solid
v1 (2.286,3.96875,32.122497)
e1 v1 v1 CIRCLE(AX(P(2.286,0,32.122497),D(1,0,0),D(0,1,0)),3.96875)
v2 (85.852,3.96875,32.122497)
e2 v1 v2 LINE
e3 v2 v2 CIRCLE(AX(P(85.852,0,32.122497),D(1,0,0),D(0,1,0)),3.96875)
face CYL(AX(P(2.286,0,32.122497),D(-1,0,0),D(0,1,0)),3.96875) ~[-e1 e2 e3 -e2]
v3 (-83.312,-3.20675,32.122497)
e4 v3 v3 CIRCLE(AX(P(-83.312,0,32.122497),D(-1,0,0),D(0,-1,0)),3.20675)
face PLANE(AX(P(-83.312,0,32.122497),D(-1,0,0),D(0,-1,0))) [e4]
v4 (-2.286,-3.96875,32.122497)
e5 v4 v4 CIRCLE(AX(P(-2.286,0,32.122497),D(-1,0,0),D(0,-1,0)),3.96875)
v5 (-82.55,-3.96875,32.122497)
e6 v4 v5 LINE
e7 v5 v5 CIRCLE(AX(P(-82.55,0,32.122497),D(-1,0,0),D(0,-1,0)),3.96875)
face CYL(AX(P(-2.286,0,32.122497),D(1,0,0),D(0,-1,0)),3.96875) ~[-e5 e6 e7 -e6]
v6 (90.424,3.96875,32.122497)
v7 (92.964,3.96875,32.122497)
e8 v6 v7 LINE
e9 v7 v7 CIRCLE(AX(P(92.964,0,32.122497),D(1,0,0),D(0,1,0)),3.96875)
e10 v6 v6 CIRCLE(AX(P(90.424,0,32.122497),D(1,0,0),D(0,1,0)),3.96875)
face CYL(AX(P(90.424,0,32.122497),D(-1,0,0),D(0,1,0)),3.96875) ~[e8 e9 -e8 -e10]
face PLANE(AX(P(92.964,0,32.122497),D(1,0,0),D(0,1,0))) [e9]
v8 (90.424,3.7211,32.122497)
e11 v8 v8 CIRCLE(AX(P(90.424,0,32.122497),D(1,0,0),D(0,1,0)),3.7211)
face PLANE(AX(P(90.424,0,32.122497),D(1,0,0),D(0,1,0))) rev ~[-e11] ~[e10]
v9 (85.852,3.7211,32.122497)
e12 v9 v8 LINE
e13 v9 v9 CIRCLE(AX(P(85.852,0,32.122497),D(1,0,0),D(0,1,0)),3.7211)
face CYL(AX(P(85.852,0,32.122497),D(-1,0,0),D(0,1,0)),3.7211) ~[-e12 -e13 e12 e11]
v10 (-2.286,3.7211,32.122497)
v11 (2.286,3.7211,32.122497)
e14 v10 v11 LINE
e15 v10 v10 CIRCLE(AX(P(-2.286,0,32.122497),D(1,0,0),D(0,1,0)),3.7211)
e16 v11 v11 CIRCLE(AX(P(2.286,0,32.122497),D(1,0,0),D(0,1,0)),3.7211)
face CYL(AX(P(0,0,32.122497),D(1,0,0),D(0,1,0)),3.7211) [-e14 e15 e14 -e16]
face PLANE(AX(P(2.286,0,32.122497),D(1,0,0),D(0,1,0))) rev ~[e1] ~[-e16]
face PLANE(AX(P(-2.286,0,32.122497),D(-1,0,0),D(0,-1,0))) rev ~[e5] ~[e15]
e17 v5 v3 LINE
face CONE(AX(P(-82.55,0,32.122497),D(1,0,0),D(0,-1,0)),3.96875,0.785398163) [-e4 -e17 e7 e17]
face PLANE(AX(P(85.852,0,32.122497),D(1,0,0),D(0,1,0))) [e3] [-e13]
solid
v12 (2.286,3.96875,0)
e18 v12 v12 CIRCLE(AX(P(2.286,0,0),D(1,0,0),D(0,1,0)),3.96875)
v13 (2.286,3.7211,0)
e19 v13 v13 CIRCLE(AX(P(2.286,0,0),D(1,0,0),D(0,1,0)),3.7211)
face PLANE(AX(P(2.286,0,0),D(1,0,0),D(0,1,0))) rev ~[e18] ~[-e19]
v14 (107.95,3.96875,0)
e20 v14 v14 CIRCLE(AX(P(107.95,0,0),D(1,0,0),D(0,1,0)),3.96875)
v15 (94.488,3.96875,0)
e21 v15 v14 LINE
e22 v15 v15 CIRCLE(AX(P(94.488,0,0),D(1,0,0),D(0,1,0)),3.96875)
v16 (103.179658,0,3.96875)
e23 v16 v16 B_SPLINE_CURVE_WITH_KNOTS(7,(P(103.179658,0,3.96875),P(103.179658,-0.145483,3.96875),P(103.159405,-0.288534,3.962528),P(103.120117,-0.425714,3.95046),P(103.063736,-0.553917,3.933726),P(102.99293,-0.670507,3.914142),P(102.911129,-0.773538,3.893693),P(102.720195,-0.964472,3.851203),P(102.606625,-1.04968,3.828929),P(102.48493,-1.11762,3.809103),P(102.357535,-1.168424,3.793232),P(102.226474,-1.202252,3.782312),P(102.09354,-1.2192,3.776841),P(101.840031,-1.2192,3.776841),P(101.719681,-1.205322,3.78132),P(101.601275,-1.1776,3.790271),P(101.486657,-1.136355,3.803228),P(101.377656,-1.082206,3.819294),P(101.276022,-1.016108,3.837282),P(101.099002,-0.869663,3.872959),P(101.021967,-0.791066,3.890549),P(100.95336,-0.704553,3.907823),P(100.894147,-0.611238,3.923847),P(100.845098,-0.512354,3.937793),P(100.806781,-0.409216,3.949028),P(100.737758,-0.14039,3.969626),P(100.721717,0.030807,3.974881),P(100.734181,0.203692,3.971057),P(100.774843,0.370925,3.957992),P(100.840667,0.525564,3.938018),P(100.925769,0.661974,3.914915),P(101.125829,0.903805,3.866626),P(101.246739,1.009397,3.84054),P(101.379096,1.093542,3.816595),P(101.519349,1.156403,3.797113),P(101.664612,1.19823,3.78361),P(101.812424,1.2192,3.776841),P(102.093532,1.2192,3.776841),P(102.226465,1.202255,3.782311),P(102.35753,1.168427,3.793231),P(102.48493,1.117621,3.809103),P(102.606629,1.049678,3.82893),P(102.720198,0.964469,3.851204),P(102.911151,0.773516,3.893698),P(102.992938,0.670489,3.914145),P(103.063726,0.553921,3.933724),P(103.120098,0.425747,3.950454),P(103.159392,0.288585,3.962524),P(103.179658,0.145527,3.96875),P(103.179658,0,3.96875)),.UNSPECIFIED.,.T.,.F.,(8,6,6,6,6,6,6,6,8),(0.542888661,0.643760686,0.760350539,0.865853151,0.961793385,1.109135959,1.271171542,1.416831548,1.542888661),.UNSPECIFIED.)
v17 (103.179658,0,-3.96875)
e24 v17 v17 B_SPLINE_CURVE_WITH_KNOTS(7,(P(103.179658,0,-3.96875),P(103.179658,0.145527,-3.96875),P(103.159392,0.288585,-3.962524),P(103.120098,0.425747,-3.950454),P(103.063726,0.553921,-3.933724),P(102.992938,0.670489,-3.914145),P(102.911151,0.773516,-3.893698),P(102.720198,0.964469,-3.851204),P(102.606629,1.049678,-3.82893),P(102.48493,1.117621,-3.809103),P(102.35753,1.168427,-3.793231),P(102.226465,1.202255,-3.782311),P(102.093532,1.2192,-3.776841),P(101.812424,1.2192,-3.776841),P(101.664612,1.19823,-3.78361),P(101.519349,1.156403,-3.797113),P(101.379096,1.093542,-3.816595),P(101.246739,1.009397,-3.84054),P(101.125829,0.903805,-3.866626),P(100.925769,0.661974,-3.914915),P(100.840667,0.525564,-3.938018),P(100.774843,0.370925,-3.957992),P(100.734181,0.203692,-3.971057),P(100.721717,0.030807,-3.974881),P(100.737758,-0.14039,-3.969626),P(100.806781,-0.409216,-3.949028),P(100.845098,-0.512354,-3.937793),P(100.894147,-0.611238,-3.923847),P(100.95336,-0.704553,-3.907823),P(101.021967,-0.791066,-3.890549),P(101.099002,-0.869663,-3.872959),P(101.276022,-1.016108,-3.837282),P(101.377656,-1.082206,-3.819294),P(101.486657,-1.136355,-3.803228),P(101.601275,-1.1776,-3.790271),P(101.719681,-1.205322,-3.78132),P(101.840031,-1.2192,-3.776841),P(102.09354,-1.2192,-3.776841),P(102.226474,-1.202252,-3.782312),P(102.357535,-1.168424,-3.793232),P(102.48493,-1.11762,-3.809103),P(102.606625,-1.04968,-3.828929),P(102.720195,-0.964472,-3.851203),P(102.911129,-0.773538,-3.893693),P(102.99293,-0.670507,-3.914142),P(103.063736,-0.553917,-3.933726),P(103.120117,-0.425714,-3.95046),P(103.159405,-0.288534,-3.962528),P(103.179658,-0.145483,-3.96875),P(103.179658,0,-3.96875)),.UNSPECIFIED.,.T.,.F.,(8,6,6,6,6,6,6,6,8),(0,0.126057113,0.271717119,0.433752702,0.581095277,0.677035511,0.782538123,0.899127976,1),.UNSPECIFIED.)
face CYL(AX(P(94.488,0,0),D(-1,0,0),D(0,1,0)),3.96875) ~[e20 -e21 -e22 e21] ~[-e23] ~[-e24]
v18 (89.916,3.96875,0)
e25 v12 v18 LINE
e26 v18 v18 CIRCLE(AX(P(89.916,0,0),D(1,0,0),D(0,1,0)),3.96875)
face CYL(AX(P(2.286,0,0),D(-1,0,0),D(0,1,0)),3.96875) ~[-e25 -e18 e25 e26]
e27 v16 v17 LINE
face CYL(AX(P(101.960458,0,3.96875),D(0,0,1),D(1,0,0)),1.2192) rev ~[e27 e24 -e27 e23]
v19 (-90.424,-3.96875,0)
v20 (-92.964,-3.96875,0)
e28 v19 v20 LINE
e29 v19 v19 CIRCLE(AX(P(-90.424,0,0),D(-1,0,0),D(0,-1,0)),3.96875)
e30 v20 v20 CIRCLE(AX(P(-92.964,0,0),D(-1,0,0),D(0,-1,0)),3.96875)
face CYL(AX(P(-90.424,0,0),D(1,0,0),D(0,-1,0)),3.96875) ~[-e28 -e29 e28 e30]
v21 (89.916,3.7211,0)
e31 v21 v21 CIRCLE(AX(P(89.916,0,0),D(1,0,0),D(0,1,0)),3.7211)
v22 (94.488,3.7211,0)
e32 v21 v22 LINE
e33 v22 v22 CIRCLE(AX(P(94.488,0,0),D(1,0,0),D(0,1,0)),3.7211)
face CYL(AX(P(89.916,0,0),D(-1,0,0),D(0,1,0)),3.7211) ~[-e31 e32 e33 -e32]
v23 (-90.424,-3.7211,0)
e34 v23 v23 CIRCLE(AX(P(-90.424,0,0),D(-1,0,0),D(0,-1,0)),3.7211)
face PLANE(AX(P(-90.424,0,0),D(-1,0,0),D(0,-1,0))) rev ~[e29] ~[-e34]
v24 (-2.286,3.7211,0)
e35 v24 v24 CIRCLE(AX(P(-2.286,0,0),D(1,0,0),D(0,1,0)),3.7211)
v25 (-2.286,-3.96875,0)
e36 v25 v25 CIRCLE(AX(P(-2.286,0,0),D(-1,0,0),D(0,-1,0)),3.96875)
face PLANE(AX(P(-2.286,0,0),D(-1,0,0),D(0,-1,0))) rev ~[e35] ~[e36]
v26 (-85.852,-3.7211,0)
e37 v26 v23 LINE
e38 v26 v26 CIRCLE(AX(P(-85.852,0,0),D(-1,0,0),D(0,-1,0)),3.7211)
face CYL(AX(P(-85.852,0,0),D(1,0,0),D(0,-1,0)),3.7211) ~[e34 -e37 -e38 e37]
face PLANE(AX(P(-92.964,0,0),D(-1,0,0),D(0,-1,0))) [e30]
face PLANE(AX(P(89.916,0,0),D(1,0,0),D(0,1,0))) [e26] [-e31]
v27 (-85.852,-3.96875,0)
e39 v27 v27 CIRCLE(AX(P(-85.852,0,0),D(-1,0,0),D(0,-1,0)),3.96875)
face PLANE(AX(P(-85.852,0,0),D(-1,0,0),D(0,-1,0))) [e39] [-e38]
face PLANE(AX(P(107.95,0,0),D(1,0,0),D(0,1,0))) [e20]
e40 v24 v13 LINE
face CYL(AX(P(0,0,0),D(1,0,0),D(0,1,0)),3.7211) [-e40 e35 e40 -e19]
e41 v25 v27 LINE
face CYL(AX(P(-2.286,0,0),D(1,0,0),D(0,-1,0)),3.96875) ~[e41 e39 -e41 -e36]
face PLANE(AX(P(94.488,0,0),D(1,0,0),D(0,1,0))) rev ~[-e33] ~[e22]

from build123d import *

# Parameters (mm, degrees)
F0_R           = 3.7211
F1_DEPTH       = 2.286
F1_DEPTH_BACK  = 2.286
F2_R           = 3.96875
F2_R_2         = 3.7211
F3_DEPTH       = 87.63
F4_R           = 3.7211
F5_DEPTH       = 4.572
F6_R           = 3.96875
F6_R_2         = 3.7211
F7_DEPTH       = 13.462
F8_R           = 3.96875
F8_R_2         = 3.7211
F9_DEPTH       = 83.566
F10_R          = 3.7211
F11_DEPTH      = 4.572
F12_R          = 3.96875
F12_R_2        = 3.7211
F13_DEPTH      = 2.54
F16_R          = 1.2192
F17_DEPTH      = 25.4
F18_R          = 3.7211
F19_DEPTH      = 2.286
F19_DEPTH_BACK = 2.286
F20_R          = 3.96875
F20_R_2        = 3.7211
F21_DEPTH      = 83.566
F22_R          = 3.7211
F23_DEPTH      = 4.572
F24_R          = 3.96875
F24_R_2        = 3.7211
F25_DEPTH      = 2.54
F26_R          = 3.96875
F26_R_2        = 3.7211
F27_DEPTH      = 81.026
F28_SIZE       = 0.762


with BuildPart() as f1:
    # F0 (on Right) → F1 (new body, two sides)
    with BuildSketch(Plane.YZ) as f1_sk:
        Circle(F0_R)
    extrude(amount=F1_DEPTH)
    extrude(f1_sk.sketch, amount=-F1_DEPTH_BACK)

    # F2 (on face) → F3 (join)
    with BuildSketch(Plane.YZ.offset(2.286)):
        Circle(F2_R)
        Circle(F2_R_2, mode=Mode.SUBTRACT)
        Circle(F2_R_2)
    extrude(amount=F3_DEPTH)

    # F4 (on face) → F5 (join)
    with BuildSketch(Plane.YZ.offset(89.916)):
        Circle(F4_R)
    extrude(amount=F5_DEPTH)

    # F6 (on face) → F7 (join)
    with BuildSketch(Plane.YZ.offset(94.488)):
        Circle(F6_R)
        Circle(F6_R_2, mode=Mode.SUBTRACT)
        Circle(F6_R_2)
    extrude(amount=F7_DEPTH)

    # F8 (on face) → F9 (join)
    with BuildSketch(Plane(origin=(-2.286, 0, 0), x_dir=(0, -1, 0), z_dir=(-1, 0, 0))):
        Circle(F8_R)
        Circle(F8_R_2, mode=Mode.SUBTRACT)
        Circle(F8_R_2)
    extrude(amount=F9_DEPTH)

    # F10 (on face) → F11 (join)
    with BuildSketch(Plane(origin=(-85.852, 0, 0), x_dir=(0, -1, 0), z_dir=(-1, 0, 0))):
        Circle(F10_R)
    extrude(amount=F11_DEPTH)

    # F12 (on face) → F13 (join)
    with BuildSketch(Plane(origin=(-90.424, 0, 0), x_dir=(0, -1, 0), z_dir=(-1, 0, 0))):
        Circle(F12_R)
        Circle(F12_R_2, mode=Mode.SUBTRACT)
        Circle(F12_R_2)
    extrude(amount=F13_DEPTH)

    # F16 (on plane+point) → F17 (cut)
    with BuildSketch(Plane.XY.offset(3.96875)):
        with Locations((101.9604578614, 0)):
            Circle(F16_R)
    extrude(amount=-F17_DEPTH, mode=Mode.SUBTRACT)


with BuildPart() as f19:
    # F18 (on Right) → F19 (new body, two sides)
    with BuildSketch(Plane.YZ) as f19_sk:
        with Locations((0, 32.1224965155)):
            Circle(F18_R)
    extrude(amount=F19_DEPTH)
    extrude(f19_sk.sketch, amount=-F19_DEPTH_BACK)

    # F20 (on face) → F21 (join)
    with BuildSketch(Plane.YZ.offset(2.286)):
        with Locations((0, 32.1224965155)):
            Circle(F20_R)
        with Locations((0, 32.1224965155)):
            Circle(F20_R_2, mode=Mode.SUBTRACT)
        with Locations((0, 32.1224965155)):
            Circle(F20_R_2)
    extrude(amount=F21_DEPTH)

    # F22 (on face) → F23 (join)
    with BuildSketch(Plane.YZ.offset(85.852)):
        with Locations((0, 32.1224965155)):
            Circle(F22_R)
    extrude(amount=F23_DEPTH)

    # F24 (on face) → F25 (join)
    with BuildSketch(Plane.YZ.offset(90.424)):
        with Locations((0, 32.1224965155)):
            Circle(F24_R)
        with Locations((0, 32.1224965155)):
            Circle(F24_R_2, mode=Mode.SUBTRACT)
        with Locations((0, 32.1224965155)):
            Circle(F24_R_2)
    extrude(amount=F25_DEPTH)

    # F26 (on face) → F27 (join)
    with BuildSketch(Plane(origin=(-2.286, 0, 0), x_dir=(0, -1, 0), z_dir=(-1, 0, 0))):
        with Locations((0, 32.1224965155)):
            Circle(F26_R)
        with Locations((0, 32.1224965155)):
            Circle(F26_R_2, mode=Mode.SUBTRACT)
        with Locations((0, 32.1224965155)):
            Circle(F26_R_2)
    extrude(amount=F27_DEPTH)

    # F28
    f28_edges = [f19.edges().sort_by_distance(p)[0] for p in [
        (-83.312, 3.96875, 32.122497),
    ]]
    chamfer(f28_edges, length=F28_SIZE)


solid = Compound([f1.part, f19.part])
